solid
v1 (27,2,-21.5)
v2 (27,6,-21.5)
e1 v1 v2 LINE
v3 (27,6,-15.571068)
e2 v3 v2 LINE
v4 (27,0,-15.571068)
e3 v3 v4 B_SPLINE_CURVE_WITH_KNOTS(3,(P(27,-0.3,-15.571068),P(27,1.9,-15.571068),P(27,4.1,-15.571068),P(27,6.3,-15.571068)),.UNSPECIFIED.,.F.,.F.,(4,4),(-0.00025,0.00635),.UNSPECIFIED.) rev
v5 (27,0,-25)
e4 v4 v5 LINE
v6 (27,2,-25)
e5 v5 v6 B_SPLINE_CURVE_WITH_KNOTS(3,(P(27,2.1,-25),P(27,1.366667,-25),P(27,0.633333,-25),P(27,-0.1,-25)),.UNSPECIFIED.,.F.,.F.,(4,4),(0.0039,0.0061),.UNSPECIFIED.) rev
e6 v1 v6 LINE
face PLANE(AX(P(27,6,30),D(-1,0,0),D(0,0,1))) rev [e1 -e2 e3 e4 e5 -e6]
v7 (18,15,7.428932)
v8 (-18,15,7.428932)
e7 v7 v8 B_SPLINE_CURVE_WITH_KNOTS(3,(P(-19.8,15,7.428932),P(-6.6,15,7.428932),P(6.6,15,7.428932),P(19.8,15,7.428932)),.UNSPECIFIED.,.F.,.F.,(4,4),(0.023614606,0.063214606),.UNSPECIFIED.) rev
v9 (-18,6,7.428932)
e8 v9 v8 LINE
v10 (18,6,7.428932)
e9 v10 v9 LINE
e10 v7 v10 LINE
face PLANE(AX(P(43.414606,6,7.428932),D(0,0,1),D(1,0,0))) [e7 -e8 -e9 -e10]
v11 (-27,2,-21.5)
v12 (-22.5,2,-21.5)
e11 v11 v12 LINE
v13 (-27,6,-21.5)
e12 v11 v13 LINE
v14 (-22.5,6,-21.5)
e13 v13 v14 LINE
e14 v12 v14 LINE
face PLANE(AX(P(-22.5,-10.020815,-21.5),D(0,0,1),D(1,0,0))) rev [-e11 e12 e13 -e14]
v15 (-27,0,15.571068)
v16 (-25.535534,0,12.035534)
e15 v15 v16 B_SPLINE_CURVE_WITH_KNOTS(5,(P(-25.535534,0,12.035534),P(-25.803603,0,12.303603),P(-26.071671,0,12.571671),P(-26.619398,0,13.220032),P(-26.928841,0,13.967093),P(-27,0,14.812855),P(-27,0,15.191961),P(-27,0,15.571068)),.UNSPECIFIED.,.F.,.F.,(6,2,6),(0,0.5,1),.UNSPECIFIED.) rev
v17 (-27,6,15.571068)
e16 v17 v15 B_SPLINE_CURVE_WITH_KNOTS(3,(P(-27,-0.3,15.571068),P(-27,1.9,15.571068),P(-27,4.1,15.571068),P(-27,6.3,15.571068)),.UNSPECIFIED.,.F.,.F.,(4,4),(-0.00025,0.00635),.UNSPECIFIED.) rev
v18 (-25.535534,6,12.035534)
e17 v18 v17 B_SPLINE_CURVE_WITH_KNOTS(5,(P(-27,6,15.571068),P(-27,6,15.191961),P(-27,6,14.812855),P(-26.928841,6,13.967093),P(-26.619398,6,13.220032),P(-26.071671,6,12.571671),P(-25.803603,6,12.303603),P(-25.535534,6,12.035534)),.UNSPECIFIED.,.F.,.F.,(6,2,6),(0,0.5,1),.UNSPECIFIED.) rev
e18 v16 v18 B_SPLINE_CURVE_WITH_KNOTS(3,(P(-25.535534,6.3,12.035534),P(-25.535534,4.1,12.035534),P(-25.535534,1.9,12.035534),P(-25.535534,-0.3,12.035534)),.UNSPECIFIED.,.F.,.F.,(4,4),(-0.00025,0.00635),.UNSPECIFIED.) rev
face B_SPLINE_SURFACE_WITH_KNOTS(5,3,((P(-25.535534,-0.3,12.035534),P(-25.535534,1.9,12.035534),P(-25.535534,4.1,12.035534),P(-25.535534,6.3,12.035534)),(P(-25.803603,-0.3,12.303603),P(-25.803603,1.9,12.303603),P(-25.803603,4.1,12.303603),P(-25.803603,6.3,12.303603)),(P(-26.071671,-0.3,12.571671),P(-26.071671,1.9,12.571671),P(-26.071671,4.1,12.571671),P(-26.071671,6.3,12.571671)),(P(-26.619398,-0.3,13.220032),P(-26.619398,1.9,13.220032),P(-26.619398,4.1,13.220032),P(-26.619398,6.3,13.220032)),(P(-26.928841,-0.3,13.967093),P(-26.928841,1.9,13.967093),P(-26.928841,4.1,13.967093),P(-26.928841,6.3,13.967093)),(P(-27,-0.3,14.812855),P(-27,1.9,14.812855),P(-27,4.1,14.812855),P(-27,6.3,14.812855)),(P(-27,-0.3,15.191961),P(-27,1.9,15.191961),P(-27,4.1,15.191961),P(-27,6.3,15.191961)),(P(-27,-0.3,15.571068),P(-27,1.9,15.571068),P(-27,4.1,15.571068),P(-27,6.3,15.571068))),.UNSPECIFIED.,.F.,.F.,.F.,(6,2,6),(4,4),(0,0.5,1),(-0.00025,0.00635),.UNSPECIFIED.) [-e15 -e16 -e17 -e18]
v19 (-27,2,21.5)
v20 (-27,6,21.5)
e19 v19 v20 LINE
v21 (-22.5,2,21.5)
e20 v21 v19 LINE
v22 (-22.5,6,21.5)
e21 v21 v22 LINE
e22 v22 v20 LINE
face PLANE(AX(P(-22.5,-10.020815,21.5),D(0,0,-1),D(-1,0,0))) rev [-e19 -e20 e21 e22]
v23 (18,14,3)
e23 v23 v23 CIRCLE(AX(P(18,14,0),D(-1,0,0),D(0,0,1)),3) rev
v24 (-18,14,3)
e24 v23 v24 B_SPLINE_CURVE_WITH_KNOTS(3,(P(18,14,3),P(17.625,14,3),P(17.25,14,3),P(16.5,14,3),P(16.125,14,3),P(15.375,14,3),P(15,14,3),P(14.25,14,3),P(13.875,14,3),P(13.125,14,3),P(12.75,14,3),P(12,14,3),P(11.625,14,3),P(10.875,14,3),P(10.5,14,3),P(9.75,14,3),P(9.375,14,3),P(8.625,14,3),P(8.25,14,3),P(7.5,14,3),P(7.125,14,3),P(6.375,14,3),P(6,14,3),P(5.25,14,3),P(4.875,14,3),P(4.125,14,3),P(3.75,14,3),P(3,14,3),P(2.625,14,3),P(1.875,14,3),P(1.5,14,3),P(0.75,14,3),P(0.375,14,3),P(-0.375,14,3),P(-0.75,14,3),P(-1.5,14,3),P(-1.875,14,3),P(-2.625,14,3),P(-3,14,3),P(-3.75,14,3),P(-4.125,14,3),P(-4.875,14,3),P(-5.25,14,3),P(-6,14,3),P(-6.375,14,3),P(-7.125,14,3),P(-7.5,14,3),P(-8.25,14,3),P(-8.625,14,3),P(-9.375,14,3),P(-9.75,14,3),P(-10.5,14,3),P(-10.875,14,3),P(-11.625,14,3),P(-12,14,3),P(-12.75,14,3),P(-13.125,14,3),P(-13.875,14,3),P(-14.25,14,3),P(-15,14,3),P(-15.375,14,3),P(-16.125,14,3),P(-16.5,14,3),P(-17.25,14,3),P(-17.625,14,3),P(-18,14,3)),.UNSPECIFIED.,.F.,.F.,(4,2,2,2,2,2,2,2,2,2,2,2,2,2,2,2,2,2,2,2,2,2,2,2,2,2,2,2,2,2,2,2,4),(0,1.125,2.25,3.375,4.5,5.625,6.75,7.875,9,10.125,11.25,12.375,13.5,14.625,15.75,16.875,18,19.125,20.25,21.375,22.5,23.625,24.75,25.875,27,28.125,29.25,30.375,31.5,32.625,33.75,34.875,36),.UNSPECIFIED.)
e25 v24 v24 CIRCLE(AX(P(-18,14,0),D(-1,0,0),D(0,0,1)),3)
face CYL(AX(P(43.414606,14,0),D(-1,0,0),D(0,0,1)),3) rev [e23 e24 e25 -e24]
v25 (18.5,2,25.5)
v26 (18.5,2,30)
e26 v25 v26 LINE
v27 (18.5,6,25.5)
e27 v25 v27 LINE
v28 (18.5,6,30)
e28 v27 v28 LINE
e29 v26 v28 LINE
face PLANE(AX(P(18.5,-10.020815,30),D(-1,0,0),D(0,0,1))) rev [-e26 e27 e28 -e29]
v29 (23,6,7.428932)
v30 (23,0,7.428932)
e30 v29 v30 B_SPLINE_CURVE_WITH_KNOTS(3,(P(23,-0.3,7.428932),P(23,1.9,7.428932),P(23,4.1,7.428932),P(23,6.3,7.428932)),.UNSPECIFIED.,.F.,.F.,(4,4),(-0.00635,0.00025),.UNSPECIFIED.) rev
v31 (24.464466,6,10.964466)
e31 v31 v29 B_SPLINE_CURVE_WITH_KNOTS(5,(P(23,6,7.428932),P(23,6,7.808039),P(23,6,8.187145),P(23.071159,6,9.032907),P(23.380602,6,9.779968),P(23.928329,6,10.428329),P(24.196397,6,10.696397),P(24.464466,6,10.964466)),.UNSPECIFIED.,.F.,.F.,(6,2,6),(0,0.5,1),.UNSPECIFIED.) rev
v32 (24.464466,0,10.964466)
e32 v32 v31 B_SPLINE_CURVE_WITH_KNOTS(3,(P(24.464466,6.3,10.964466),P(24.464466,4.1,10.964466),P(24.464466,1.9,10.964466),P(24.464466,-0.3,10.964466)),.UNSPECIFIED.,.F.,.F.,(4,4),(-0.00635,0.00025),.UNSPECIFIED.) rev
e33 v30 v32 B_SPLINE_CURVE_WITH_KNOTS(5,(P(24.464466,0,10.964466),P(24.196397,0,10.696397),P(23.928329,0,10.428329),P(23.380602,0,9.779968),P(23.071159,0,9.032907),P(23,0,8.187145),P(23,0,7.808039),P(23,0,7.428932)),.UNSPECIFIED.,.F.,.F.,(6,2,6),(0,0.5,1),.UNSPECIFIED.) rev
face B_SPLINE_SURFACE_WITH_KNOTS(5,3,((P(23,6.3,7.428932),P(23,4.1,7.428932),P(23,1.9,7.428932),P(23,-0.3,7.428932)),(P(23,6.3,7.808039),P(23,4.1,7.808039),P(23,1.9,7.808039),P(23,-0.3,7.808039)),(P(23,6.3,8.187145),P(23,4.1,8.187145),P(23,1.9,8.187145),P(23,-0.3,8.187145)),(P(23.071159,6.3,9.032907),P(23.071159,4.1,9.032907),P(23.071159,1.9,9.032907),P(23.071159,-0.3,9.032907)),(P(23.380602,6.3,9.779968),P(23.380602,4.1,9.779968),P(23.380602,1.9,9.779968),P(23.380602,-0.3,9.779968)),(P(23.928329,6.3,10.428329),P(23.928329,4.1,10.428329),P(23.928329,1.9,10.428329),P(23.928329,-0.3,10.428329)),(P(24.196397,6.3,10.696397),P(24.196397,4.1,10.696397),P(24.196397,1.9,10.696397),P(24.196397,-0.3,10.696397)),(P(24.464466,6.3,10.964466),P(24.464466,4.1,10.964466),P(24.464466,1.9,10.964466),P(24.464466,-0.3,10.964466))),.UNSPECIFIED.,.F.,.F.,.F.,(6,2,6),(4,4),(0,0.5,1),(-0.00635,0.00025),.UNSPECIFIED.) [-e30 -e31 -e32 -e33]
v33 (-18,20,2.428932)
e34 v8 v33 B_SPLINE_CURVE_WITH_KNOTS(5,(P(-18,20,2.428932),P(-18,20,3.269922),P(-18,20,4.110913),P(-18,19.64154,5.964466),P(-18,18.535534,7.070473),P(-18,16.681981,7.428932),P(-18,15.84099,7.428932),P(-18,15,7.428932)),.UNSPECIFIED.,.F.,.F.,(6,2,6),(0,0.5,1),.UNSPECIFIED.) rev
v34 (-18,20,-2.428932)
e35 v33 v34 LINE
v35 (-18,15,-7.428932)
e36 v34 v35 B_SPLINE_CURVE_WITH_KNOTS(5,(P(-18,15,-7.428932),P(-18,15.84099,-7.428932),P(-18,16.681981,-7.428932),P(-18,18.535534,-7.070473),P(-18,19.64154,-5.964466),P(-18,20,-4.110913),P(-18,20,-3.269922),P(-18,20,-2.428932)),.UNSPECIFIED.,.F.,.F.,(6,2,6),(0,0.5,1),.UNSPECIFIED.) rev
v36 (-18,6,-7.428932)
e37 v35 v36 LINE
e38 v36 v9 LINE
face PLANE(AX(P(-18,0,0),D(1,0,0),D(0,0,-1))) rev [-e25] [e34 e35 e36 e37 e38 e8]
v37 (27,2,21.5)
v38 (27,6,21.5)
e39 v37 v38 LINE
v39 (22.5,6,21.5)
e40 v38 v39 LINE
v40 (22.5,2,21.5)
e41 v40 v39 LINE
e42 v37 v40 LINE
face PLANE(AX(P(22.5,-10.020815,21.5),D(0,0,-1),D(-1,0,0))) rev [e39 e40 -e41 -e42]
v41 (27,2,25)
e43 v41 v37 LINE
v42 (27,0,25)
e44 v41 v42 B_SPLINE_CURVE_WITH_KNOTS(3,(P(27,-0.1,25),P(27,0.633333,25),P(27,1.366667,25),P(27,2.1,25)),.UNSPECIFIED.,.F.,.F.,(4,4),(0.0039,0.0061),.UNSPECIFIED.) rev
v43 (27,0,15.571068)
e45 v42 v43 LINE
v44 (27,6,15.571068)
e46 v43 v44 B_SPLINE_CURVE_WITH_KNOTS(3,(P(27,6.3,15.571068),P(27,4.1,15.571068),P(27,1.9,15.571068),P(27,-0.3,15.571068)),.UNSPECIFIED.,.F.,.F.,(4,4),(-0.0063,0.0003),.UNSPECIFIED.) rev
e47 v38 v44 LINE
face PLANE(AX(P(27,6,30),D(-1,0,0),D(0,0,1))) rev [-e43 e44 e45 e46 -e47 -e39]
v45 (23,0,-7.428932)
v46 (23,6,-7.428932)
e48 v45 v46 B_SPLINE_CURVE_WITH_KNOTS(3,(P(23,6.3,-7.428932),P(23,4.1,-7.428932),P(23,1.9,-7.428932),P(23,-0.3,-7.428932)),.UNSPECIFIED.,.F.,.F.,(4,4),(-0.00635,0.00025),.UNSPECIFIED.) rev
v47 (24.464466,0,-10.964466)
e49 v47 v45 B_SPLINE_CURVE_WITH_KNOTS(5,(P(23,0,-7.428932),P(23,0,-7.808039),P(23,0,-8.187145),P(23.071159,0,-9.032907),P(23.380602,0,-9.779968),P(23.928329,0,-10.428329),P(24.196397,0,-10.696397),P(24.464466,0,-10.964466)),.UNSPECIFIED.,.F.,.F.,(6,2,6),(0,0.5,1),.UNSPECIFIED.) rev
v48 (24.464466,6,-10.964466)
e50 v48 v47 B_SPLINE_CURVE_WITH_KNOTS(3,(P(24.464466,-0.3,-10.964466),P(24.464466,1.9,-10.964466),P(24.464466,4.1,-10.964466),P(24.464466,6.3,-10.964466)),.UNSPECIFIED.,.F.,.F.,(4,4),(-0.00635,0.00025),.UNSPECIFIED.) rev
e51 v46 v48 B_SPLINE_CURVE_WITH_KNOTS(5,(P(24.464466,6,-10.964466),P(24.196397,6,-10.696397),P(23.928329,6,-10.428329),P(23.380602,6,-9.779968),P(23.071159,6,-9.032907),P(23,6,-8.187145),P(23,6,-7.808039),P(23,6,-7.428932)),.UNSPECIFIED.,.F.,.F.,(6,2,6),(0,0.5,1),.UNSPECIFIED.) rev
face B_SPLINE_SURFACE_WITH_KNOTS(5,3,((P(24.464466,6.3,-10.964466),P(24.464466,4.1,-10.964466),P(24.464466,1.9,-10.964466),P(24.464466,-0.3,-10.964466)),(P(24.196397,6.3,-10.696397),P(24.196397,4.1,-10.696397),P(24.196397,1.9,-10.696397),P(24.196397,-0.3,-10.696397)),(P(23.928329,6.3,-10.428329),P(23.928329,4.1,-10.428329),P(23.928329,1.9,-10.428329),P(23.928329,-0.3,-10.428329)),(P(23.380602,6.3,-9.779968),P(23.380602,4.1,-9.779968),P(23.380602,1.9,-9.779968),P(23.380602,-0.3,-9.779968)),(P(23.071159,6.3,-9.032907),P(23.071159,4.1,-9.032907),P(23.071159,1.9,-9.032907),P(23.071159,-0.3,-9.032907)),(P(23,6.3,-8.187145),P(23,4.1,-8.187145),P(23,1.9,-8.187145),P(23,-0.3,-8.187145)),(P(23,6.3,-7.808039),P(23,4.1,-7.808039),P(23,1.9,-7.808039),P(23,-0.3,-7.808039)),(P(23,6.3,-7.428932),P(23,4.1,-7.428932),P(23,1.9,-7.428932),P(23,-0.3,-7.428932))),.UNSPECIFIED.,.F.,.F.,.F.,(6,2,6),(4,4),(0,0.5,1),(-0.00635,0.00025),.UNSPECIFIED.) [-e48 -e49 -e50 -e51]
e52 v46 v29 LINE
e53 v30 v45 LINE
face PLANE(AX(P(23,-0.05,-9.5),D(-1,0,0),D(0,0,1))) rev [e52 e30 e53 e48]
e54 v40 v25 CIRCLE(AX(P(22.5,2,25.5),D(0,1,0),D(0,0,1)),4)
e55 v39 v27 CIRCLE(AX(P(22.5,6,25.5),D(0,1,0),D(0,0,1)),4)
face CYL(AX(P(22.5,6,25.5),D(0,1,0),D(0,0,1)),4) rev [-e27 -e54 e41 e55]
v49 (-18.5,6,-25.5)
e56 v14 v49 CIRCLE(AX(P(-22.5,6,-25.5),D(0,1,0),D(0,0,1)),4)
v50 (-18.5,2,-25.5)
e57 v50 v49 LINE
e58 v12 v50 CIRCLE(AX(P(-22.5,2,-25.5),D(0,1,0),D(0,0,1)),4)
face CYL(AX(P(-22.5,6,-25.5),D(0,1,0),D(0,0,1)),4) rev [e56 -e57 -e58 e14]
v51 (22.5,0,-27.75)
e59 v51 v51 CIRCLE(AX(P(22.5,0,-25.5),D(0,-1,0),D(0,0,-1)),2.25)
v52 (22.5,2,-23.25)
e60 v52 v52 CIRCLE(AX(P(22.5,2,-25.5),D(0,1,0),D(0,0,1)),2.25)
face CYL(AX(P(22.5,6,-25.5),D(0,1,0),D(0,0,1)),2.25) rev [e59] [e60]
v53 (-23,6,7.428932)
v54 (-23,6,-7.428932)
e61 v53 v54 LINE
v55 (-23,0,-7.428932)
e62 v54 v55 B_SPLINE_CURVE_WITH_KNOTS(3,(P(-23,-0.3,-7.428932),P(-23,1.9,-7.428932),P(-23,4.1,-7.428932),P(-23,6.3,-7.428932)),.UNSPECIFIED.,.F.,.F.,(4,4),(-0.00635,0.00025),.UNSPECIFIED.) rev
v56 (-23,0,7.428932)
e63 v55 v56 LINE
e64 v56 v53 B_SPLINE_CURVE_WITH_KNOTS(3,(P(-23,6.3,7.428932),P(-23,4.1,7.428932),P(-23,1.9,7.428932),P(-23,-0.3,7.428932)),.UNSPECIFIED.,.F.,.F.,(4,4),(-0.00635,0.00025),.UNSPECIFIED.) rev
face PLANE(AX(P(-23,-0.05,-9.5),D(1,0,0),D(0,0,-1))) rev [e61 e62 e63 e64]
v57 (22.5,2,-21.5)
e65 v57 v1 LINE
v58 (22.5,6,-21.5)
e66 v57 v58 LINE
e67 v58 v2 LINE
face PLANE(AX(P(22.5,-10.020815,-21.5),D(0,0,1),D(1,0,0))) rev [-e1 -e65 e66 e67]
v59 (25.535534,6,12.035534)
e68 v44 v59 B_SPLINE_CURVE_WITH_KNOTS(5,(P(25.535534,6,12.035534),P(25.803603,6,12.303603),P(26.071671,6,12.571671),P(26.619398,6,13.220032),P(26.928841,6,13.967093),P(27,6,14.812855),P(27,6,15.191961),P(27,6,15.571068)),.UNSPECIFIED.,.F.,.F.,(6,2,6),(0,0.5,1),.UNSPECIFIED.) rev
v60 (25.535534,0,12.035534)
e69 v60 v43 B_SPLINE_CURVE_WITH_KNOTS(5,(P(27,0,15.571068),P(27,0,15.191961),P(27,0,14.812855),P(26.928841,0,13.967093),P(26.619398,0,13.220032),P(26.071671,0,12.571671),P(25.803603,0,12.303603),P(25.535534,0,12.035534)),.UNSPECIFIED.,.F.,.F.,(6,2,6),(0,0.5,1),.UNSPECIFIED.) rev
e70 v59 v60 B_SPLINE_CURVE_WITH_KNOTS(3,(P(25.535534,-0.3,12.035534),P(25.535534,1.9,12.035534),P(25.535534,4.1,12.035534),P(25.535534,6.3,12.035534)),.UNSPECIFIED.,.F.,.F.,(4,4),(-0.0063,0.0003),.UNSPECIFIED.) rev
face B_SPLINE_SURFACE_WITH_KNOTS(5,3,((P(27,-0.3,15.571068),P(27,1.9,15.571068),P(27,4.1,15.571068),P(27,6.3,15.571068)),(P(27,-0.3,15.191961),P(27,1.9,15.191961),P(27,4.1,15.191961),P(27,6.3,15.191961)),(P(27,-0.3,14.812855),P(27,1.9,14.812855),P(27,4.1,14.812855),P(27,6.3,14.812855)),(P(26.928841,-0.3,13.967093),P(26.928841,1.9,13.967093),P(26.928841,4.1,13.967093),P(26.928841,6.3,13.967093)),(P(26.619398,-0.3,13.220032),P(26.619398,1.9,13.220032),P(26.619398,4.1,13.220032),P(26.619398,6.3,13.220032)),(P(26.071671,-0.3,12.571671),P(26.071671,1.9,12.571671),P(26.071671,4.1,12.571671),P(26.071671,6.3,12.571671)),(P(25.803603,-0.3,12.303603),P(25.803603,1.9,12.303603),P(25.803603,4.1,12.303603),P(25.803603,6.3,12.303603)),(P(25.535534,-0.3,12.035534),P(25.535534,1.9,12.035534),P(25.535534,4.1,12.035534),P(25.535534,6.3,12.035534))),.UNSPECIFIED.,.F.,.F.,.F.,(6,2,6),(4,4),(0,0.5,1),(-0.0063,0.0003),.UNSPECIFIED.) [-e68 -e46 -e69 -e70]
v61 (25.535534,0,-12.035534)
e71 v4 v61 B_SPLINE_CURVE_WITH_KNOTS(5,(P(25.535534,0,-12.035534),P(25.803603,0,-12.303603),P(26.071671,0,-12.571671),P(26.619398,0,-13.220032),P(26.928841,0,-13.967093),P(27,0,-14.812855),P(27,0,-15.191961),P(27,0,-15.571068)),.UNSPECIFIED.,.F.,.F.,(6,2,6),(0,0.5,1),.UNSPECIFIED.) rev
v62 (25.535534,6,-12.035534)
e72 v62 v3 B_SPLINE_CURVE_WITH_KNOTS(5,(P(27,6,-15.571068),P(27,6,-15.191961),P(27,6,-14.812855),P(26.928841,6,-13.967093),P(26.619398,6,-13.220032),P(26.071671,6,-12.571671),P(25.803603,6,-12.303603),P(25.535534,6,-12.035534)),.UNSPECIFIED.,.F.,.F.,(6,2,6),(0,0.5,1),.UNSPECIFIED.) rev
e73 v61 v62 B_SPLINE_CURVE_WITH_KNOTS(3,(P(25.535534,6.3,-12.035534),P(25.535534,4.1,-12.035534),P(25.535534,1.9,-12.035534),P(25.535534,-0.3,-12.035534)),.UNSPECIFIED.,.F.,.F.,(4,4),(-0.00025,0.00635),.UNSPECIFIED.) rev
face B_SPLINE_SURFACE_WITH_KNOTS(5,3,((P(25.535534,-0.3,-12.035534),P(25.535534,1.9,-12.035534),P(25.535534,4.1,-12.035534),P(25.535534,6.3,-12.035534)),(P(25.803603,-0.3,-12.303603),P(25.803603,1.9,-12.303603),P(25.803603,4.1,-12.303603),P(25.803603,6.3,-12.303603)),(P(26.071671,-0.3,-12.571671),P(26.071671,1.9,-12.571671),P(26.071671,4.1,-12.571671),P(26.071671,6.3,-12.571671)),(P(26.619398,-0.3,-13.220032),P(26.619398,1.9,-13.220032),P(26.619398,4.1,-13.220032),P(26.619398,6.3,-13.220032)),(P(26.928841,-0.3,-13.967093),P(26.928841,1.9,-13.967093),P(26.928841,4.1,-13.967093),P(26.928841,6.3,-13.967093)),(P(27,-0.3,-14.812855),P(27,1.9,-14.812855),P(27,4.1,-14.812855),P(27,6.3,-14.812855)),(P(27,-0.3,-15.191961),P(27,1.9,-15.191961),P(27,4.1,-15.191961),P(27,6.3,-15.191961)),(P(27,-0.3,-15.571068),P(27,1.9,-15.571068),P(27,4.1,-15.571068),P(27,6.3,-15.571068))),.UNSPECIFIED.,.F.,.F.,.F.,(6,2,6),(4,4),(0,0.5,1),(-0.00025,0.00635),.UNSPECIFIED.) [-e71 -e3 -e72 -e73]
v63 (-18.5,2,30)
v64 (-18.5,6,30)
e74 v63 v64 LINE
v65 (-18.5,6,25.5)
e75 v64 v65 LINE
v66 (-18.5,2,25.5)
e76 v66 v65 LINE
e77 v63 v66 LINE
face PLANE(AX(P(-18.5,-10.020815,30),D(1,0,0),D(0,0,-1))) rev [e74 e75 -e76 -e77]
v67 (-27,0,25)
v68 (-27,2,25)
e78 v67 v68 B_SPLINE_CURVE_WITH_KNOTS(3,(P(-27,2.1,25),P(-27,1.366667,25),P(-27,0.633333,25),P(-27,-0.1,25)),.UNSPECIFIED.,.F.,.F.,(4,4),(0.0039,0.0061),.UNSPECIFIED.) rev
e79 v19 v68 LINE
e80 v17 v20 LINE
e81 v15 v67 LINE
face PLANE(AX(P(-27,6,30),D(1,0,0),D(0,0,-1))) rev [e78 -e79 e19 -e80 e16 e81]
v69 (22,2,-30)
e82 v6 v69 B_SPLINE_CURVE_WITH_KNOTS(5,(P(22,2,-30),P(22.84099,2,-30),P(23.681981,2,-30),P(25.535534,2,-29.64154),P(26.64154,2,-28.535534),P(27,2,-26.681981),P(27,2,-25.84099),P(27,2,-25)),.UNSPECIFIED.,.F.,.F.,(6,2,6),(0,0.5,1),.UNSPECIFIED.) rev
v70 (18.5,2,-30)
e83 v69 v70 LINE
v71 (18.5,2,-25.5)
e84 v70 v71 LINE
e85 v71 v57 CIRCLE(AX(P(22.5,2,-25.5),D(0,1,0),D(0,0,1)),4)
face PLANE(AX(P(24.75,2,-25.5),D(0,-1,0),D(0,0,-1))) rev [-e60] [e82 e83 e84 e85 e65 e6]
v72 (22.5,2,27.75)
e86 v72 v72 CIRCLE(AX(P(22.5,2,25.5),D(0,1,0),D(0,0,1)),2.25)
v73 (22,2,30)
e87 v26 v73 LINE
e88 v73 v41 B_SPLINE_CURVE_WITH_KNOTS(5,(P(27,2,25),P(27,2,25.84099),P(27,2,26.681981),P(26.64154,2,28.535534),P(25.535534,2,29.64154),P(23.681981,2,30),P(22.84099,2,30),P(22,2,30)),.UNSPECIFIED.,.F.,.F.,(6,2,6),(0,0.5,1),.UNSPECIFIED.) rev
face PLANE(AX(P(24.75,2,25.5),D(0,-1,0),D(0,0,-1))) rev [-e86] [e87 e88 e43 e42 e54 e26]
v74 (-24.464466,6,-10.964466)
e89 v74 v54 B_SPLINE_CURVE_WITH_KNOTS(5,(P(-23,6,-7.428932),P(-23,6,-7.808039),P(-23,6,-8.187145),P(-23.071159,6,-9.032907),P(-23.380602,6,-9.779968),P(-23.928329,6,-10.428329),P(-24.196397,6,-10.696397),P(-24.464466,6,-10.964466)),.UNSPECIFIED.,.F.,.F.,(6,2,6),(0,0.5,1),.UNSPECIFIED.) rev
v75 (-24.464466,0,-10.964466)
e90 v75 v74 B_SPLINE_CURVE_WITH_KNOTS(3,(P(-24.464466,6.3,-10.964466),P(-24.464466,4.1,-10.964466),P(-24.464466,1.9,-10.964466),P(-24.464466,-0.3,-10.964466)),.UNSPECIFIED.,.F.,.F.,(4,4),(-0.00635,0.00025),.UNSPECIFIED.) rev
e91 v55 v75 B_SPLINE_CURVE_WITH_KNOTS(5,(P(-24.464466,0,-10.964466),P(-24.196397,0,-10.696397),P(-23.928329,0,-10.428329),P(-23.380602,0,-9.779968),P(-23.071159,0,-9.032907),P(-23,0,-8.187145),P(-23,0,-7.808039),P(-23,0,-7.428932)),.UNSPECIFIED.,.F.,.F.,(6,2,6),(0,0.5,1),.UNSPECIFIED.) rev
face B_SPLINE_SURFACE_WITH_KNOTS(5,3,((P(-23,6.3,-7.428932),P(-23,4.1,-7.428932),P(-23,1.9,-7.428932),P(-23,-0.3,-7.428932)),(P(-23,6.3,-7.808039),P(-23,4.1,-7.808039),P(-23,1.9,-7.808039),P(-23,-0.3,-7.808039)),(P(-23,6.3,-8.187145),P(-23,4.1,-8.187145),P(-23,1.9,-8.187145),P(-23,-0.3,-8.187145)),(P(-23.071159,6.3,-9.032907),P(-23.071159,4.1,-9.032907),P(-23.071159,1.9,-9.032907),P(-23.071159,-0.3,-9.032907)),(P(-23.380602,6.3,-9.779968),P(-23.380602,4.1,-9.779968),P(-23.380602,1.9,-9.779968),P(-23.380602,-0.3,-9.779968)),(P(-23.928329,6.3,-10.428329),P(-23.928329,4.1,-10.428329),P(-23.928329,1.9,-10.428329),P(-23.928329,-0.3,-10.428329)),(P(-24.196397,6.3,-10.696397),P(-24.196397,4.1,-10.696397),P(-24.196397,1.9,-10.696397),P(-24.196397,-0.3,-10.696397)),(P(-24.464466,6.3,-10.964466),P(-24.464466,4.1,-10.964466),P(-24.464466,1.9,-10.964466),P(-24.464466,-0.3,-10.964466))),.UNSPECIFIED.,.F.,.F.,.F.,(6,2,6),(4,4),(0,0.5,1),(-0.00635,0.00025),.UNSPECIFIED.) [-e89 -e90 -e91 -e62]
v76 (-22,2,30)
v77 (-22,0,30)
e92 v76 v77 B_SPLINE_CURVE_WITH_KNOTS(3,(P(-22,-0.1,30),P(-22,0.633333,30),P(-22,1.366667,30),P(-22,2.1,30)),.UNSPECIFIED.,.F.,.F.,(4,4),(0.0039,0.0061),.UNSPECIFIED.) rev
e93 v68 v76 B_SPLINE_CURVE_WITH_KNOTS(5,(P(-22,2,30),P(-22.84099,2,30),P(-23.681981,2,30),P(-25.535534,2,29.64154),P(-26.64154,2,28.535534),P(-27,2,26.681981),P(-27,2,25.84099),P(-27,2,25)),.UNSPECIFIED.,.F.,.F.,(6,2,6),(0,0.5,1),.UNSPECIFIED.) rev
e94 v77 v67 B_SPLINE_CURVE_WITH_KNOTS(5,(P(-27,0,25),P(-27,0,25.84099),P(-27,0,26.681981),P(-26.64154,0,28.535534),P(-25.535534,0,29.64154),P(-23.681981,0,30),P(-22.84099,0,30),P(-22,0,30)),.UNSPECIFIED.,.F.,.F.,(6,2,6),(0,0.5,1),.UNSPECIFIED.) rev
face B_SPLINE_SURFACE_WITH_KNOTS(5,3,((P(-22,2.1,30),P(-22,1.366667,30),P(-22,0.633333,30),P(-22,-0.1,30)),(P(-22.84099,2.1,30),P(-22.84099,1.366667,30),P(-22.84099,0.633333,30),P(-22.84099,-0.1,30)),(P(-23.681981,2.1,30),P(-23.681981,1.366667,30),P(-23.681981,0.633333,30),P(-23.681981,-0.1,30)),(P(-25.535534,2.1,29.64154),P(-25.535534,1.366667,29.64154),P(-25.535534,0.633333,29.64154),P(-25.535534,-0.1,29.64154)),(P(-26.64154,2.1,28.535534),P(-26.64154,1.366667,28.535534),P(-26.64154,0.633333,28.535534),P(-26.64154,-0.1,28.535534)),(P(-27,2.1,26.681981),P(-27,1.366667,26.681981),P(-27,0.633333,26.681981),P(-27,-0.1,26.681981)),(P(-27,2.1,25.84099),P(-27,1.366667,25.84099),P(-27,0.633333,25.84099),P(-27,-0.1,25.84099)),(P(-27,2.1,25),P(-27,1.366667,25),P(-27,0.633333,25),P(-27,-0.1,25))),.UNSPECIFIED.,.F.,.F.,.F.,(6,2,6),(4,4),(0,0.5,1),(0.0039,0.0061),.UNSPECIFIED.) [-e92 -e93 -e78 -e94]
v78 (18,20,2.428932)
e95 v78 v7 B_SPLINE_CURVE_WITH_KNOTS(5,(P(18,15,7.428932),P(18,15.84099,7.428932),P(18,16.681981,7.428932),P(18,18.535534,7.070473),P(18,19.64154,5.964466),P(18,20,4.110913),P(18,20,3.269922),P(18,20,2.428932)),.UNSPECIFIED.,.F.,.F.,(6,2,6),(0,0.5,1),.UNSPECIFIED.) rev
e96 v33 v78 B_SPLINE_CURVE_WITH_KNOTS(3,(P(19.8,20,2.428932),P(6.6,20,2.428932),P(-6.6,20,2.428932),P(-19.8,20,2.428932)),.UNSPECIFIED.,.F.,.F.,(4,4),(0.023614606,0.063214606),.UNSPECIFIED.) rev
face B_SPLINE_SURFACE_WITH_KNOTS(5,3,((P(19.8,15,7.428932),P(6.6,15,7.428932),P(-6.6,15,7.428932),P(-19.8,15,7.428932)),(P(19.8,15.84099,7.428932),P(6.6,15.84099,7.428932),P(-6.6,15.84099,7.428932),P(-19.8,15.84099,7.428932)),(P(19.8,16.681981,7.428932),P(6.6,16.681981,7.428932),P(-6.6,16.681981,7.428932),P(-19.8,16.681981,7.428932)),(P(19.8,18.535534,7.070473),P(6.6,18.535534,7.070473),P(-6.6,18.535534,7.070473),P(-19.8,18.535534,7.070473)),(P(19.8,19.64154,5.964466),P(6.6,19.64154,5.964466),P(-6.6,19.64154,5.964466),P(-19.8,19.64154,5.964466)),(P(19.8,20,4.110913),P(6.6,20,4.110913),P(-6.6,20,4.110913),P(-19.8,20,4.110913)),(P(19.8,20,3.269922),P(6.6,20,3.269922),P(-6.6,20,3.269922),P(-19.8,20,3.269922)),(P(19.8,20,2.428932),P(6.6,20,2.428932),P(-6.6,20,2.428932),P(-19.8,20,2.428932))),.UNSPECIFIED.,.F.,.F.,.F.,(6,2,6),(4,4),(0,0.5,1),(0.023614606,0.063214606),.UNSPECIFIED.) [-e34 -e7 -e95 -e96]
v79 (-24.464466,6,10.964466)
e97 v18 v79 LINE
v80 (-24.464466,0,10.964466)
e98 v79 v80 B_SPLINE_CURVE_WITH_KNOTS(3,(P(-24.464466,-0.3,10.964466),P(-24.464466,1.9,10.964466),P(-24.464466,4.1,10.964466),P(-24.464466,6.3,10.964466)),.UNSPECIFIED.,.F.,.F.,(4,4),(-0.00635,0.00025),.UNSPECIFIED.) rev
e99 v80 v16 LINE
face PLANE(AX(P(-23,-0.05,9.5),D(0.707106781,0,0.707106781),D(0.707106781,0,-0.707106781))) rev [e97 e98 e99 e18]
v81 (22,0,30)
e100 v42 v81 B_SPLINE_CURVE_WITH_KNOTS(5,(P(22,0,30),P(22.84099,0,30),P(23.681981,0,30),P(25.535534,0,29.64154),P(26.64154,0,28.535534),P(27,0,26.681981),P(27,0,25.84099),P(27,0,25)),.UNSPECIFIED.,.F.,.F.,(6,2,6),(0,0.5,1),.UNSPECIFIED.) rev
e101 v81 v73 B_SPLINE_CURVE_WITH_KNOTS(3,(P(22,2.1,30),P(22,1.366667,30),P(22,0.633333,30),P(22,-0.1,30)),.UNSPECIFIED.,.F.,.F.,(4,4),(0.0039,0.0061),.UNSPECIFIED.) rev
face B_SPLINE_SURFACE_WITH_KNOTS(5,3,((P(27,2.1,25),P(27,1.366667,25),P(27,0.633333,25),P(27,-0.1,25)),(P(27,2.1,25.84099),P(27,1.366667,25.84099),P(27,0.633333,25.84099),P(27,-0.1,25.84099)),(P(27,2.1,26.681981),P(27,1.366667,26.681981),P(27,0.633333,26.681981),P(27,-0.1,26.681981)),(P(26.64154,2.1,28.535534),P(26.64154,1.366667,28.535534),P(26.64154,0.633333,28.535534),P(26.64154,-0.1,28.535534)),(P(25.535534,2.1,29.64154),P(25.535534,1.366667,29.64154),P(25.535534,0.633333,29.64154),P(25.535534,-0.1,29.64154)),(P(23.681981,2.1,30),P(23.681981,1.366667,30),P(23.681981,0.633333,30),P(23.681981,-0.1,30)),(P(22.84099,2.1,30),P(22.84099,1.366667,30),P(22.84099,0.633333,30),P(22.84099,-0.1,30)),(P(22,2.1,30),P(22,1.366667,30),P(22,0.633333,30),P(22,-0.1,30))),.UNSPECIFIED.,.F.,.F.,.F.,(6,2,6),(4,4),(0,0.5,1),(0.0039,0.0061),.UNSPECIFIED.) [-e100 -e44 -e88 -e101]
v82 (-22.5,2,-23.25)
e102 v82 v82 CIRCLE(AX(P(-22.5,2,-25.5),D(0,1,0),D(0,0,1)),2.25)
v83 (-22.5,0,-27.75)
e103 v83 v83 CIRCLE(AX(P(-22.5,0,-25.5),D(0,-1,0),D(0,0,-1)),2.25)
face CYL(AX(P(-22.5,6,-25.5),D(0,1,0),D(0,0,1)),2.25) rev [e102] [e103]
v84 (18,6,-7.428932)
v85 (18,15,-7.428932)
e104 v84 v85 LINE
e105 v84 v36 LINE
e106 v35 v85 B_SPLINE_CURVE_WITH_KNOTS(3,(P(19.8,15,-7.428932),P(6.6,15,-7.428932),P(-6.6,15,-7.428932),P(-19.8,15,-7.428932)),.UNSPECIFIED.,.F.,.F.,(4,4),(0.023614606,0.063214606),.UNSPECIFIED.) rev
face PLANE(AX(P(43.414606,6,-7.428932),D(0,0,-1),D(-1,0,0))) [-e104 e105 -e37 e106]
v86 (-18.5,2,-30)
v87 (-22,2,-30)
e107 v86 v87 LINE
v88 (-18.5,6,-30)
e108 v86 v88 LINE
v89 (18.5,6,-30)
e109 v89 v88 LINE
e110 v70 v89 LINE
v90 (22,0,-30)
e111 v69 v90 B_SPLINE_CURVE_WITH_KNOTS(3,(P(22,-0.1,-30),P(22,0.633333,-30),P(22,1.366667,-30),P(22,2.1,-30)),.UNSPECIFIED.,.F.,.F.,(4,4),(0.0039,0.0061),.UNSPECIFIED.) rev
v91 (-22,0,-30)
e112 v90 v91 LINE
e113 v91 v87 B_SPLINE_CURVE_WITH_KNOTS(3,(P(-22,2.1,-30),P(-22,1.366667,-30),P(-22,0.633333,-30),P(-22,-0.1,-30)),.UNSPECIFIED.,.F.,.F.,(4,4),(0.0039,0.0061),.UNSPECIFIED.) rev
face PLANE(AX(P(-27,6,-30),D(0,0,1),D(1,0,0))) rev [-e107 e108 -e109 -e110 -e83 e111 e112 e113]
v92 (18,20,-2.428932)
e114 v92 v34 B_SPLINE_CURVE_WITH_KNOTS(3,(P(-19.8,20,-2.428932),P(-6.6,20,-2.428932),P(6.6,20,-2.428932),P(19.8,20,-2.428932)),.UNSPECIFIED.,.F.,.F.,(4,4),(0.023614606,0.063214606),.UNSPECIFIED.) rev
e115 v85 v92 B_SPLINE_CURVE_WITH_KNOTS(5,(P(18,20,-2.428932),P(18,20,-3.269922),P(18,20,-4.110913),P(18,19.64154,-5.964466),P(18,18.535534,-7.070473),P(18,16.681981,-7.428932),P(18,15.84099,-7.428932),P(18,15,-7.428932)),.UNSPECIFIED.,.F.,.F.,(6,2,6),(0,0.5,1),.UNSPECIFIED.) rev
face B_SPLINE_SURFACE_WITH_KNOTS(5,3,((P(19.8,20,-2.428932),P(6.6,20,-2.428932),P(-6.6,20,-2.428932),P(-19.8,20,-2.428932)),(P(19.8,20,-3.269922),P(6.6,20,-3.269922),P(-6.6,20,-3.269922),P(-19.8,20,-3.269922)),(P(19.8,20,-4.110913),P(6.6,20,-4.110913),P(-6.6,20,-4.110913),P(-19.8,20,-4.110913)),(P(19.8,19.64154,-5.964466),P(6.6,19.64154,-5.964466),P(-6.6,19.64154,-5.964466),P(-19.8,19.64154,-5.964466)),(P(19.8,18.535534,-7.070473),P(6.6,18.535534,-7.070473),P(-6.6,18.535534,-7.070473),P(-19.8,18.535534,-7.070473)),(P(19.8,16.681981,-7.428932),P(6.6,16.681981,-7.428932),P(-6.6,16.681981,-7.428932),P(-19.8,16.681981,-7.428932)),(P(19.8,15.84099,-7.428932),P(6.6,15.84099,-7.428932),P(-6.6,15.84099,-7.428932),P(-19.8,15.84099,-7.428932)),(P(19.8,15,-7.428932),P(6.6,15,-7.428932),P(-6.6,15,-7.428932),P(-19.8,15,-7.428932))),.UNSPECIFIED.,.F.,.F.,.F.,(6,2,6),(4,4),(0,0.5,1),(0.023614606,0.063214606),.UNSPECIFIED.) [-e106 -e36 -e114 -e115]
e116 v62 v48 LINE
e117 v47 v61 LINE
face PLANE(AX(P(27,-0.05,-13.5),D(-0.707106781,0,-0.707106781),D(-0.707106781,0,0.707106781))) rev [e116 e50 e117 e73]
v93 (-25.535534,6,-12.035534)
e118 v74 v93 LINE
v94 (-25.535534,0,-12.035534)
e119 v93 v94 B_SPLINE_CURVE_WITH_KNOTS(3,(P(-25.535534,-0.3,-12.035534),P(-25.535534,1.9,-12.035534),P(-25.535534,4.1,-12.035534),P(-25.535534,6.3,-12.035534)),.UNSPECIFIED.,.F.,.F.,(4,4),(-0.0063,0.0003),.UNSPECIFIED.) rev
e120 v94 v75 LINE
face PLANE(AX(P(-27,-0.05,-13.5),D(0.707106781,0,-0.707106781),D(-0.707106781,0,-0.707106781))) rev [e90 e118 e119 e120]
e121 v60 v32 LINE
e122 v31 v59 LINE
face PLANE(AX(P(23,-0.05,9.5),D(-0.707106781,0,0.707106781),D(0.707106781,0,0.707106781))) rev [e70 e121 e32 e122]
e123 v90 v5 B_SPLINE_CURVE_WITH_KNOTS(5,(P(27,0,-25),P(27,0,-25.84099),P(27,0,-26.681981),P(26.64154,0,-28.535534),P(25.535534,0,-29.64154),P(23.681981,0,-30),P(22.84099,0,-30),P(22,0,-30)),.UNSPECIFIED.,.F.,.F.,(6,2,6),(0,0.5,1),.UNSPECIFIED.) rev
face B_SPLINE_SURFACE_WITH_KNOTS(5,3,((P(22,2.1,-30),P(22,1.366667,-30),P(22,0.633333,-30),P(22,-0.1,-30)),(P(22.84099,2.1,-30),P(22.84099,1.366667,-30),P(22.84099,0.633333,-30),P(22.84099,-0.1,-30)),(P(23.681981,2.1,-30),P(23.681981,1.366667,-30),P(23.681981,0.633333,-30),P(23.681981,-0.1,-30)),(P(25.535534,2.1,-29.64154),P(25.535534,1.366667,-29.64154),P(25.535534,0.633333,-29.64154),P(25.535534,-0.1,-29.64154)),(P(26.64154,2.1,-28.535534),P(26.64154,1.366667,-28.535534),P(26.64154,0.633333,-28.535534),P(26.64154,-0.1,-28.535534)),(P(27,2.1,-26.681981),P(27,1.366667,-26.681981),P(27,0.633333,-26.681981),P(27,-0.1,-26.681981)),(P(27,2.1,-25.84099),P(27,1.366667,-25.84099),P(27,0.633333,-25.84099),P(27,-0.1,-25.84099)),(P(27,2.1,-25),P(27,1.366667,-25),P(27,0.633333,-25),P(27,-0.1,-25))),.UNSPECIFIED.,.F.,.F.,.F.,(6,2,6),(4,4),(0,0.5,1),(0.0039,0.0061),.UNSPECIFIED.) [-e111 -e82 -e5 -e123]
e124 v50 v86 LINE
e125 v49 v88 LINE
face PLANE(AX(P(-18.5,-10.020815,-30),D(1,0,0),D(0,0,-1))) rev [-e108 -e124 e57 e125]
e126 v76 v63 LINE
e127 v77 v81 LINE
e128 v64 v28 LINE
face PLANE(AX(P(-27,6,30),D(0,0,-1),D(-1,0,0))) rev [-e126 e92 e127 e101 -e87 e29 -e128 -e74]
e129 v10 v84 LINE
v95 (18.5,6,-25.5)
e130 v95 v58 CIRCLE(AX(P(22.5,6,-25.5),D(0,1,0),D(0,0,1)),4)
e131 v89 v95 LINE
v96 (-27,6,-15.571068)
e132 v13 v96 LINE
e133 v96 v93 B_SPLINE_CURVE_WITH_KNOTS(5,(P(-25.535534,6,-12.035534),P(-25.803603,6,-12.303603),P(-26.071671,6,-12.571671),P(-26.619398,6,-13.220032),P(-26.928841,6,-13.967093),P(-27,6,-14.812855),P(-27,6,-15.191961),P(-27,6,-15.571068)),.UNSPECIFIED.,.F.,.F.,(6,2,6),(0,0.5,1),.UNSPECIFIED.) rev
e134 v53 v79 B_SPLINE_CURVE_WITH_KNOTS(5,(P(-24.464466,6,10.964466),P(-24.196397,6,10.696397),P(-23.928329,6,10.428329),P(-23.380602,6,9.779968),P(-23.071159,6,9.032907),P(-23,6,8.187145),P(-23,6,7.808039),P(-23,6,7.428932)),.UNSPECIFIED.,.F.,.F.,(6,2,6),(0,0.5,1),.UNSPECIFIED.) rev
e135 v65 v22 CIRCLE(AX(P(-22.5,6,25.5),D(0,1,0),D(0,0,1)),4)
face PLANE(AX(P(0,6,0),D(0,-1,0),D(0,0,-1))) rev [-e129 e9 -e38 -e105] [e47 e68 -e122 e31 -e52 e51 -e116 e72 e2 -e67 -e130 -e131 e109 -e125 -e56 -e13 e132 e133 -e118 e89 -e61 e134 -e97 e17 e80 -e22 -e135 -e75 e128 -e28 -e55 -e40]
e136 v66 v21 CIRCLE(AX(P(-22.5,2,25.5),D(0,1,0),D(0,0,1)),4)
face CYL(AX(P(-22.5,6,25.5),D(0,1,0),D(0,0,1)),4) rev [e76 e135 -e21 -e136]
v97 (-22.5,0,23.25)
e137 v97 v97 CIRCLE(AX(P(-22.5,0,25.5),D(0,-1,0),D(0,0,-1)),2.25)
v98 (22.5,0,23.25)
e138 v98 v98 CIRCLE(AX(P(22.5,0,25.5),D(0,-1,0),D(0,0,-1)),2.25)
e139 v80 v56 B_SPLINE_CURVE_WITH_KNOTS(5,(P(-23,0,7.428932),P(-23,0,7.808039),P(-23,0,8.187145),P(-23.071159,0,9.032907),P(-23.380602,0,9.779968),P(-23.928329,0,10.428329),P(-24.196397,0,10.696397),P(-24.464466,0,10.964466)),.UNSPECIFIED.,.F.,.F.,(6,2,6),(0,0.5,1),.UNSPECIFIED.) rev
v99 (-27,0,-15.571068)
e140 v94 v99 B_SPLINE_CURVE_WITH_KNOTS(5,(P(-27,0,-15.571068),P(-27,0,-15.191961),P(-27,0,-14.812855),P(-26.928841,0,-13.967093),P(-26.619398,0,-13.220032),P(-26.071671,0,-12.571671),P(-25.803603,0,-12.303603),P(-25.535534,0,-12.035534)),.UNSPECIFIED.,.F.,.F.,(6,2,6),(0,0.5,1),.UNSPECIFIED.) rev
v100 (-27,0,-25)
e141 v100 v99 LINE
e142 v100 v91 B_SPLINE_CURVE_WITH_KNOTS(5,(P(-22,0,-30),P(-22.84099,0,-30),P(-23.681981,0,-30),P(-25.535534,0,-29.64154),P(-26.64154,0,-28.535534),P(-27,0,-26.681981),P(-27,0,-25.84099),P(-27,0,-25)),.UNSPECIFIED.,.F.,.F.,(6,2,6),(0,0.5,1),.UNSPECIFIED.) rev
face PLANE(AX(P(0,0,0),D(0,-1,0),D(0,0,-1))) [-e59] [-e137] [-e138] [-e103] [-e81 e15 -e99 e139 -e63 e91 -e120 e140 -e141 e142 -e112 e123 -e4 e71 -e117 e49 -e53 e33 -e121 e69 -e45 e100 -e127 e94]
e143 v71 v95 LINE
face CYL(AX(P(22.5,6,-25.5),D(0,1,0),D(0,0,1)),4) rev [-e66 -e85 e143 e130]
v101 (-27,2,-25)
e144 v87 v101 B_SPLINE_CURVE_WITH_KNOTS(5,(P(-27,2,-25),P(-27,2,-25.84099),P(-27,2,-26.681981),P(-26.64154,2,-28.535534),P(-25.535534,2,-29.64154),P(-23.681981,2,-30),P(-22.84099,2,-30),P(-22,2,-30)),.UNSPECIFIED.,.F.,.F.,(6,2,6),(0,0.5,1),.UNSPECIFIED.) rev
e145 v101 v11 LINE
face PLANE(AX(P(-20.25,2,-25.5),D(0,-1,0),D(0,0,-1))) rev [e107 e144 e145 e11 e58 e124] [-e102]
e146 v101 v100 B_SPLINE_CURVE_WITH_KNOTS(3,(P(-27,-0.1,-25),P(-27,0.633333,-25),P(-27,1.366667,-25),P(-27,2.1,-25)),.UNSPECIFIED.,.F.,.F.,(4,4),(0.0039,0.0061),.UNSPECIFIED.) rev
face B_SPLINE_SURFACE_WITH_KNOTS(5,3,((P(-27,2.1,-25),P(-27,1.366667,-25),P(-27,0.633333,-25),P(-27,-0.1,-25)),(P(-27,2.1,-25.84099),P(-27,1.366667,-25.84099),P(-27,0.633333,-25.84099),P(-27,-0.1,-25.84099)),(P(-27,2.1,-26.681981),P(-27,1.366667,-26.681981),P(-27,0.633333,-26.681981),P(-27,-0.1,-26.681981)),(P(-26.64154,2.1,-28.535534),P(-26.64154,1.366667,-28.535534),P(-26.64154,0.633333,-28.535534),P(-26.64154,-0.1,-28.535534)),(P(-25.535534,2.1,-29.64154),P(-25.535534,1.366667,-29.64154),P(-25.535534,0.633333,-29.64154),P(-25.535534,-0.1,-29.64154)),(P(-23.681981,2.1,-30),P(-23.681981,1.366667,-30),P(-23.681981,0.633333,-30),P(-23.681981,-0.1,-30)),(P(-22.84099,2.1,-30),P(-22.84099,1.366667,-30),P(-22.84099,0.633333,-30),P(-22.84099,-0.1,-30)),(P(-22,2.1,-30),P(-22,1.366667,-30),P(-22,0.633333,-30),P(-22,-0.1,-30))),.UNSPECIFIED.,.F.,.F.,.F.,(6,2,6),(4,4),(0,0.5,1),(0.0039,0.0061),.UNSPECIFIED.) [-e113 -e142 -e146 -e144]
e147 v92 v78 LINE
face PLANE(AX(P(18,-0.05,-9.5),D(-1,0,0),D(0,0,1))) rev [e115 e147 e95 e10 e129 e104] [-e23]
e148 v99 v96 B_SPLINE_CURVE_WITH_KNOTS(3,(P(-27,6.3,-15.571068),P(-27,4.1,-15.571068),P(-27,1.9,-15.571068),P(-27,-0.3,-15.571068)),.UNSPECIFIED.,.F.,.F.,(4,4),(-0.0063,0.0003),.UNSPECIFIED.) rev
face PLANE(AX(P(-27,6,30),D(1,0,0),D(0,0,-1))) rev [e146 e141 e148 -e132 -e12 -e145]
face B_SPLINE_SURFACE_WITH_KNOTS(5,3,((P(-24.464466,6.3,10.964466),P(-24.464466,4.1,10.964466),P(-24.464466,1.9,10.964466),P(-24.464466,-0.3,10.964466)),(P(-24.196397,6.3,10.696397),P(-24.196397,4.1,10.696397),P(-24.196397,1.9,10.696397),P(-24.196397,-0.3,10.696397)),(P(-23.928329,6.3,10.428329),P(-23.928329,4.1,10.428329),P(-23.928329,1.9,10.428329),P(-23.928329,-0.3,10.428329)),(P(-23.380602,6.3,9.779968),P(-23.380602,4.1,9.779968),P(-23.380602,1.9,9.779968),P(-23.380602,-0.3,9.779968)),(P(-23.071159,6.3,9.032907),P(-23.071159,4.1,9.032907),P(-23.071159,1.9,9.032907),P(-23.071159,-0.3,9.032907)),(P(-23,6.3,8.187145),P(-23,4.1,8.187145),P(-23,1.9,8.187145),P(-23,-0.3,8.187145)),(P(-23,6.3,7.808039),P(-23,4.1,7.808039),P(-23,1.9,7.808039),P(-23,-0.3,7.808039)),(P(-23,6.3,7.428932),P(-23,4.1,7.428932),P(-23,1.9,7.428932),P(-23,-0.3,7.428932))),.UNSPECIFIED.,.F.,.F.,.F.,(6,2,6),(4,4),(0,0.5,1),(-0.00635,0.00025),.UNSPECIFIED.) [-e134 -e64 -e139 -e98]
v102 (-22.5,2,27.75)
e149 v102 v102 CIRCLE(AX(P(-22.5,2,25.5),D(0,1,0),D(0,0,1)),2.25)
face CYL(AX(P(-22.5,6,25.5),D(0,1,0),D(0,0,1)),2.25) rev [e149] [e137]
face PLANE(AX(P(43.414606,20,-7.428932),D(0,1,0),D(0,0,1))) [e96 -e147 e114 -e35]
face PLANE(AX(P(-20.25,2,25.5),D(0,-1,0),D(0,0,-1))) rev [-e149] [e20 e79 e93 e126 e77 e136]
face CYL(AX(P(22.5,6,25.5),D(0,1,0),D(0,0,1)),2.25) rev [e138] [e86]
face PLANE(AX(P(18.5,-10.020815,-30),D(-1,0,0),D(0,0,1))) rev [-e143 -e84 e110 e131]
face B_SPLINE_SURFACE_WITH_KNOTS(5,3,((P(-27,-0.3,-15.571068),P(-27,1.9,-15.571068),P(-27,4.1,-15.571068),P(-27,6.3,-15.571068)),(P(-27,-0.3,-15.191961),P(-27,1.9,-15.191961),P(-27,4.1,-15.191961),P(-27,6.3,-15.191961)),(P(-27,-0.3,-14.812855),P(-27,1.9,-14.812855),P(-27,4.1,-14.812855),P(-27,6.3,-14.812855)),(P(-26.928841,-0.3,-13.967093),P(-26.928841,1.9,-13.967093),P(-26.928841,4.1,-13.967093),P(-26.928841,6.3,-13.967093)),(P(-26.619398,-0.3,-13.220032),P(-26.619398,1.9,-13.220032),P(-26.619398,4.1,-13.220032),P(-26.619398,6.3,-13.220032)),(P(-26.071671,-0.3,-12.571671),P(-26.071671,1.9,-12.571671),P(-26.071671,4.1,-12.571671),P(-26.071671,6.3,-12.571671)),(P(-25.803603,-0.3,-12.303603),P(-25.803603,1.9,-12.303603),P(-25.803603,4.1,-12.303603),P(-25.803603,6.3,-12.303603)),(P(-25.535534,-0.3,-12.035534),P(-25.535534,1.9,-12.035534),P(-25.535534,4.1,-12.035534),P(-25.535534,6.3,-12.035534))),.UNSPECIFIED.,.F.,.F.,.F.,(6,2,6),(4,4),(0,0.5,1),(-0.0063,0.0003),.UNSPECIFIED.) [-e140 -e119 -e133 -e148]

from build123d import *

# Parameters (mm, degrees)
SKETCH1_W                      = 54
SKETCH1_H                      = 60
BOSS_EXTRUDE1_DEPTH            = 6
CBORE_FOR_M4_SHCS1_D           = 4.5
CBORE_FOR_M4_SHCS1_DEPTH       = 12.4
CBORE_FOR_M4_SHCS1_CBORE_D     = 8
CBORE_FOR_M4_SHCS1_CBORE_DEPTH = 4
CBORE_FOR_M4_SHCS1_TIP         = 1.351936393
CUT_EXTRUDE1_DEPTH             = 4
FILLET1_SIZE                   = 5
CUT_EXTRUDE2_DEPTH             = 41.804411681
BOSS_EXTRUDE2_START            = -5
SKETCH6_W                      = 14.857864376
SKETCH6_H                      = 14
SKETCH6_R                      = 3
BOSS_EXTRUDE2_DEPTH            = 36
FILLET3_SIZE                   = 5


with BuildPart() as part:
    # Sketch1 → Boss-Extrude1 (new body)
    with BuildSketch(Plane(origin=(0, 0, 0), x_dir=(1, 0, 0), z_dir=(0, 1, 0))):
        Rectangle(SKETCH1_W, SKETCH1_H)
    extrude(amount=BOSS_EXTRUDE1_DEPTH)

    # CBORE for M4 SHCS1
    with Locations(Plane(origin=(0, 6, 0), x_dir=(1, 0, 0), z_dir=(0, 1, 0))):
        with Locations((-22.5, 25.5), (-22.5, -25.5), (22.5, -25.5), (22.5, 25.5)):
            CounterBoreHole(CBORE_FOR_M4_SHCS1_D / 2, CBORE_FOR_M4_SHCS1_CBORE_D / 2, CBORE_FOR_M4_SHCS1_CBORE_DEPTH, depth=CBORE_FOR_M4_SHCS1_DEPTH)
            with Locations((0, 0, -(CBORE_FOR_M4_SHCS1_DEPTH + CBORE_FOR_M4_SHCS1_TIP / 2))):  # 118° drill point
                Cone(0, CBORE_FOR_M4_SHCS1_D / 2, CBORE_FOR_M4_SHCS1_TIP, mode=Mode.SUBTRACT)

    # Sketch4 → Cut-Extrude1 (cut)
    with BuildSketch(Plane(origin=(0, 6, 0), x_dir=(1, 0, 0), z_dir=(0, 1, 0))):
        with BuildLine():
            Line((-22.5, 21.5), (-27, 21.5))
            Line((-27, 21.5), (-27, 30))
            Line((-27, 30), (-18.5, 30))
            Line((-18.5, 30), (-18.5, 25.5))
            ThreePointArc((-18.5, 25.5), (-19.671572875, 22.671572875), (-22.5, 21.5))
        make_face()
        with BuildLine():
            Line((22.5, 21.5), (27, 21.5))
            Line((27, 21.5), (27, 30))
            Line((27, 30), (18.5, 30))
            Line((18.5, 30), (18.5, 25.5))
            ThreePointArc((18.5, 25.5), (19.671572875, 22.671572875), (22.5, 21.5))
        make_face()
        with BuildLine():
            Line((18.5, -30), (18.5, -25.5))
            ThreePointArc((18.5, -25.5), (19.671572875, -22.671572875), (22.5, -21.5))
            Line((22.5, -21.5), (27, -21.5))
            Line((27, -21.5), (27, -30))
            Line((27, -30), (18.5, -30))
        make_face()
        with BuildLine():
            Line((-18.5, -30), (-18.5, -25.5))
            ThreePointArc((-18.5, -25.5), (-19.671572875, -22.671572875), (-22.5, -21.5))
            Line((-22.5, -21.5), (-27, -21.5))
            Line((-27, -21.5), (-27, -30))
            Line((-27, -30), (-18.5, -30))
        make_face()
    extrude(amount=-CUT_EXTRUDE1_DEPTH, mode=Mode.SUBTRACT)

    # Fillet1
    # a fillet whose section is not a circle: 5 mm, written as the material it takes off along each edge
    with BuildSketch(Plane(origin=(27, -12.5, -30), x_dir=(0, 0, 1), z_dir=(0, 1, 0)), Plane(origin=(27, -12.5, 30), x_dir=(-1, 0, 0), z_dir=(0, 1, 0))) as fillet1_piece_1:
        with BuildLine():
            add(Edge.make_bspline([(FILLET1_SIZE, 0), (FILLET1_SIZE * 0.831801948466, 0), (FILLET1_SIZE * 0.663603896932, 0), (FILLET1_SIZE * 0.292893218813, -FILLET1_SIZE * 0.0716919198361), (FILLET1_SIZE * 0.0716919198361, -FILLET1_SIZE * 0.292893218813), (0, -FILLET1_SIZE * 0.663603896932), (0, -FILLET1_SIZE * 0.831801948466), (0, -FILLET1_SIZE)], knots=[0, 0, 0, 0, 0, 0, 0.5, 0.5, 1, 1, 1, 1, 1, 1], degree=5))
            Line((0, -FILLET1_SIZE), (0, 0))
            Line((0, 0), (FILLET1_SIZE, 0))
        make_face()
    extrude(amount=27, mode=Mode.SUBTRACT)
    with BuildSketch(Plane(origin=(-27, -12.5, -30), x_dir=(0, 0, 1), z_dir=(0, 1, 0)), Plane(origin=(-27, -12.5, 30), x_dir=(1, 0, 0), z_dir=(0, 1, 0))) as fillet1_piece_2:
        with BuildLine():
            add(Edge.make_bspline([(FILLET1_SIZE, 0), (FILLET1_SIZE * 0.831801948466, 0), (FILLET1_SIZE * 0.663603896932, 0), (FILLET1_SIZE * 0.292893218813, FILLET1_SIZE * 0.0716919198361), (FILLET1_SIZE * 0.0716919198361, FILLET1_SIZE * 0.292893218813), (0, FILLET1_SIZE * 0.663603896932), (0, FILLET1_SIZE * 0.831801948466), (0, FILLET1_SIZE)], knots=[0, 0, 0, 0, 0, 0, 0.5, 0.5, 1, 1, 1, 1, 1, 1], degree=5))
            Line((0, FILLET1_SIZE), (0, 0))
            Line((0, 0), (FILLET1_SIZE, 0))
        make_face()
    extrude(amount=27, mode=Mode.SUBTRACT)

    # Sketch5 → Cut-Extrude2 (cut, through all)
    with BuildSketch(Plane(origin=(0, 6, 0), x_dir=(1, 0, 0), z_dir=(0, 1, 0))):
        Polygon((-27, 13.5), (-23, 9.5), (-23, -9.5), (-27, -13.5), align=None)
        Polygon((27, 13.5), (23, 9.5), (23, -9.5), (27, -13.5), align=None)
    extrude(amount=-CUT_EXTRUDE2_DEPTH, mode=Mode.SUBTRACT)

    # Fillet2
    # a fillet whose section is not a circle: 5 mm, written as the material it adds along each edge
    with BuildSketch(Plane(origin=(-23, 6, 9.5), x_dir=(-0.7071067811865389, 0, 0.7071067811865561), z_dir=(0, -1, 0)), Plane(origin=(23, 6, 9.5), x_dir=(0, 0, -1), z_dir=(0, -1, 0)), Plane(origin=(23, 6, -9.5), x_dir=(0.707106781186557, 0, -0.7071067811865381), z_dir=(0, -1, 0)), Plane(origin=(-23, 6, -9.5), x_dir=(0, 0, 1), z_dir=(0, -1, 0))) as fillet2_piece_1:
        with BuildLine():
            add(Edge.make_bspline([(2.071067812, 0), (1.691961313, 0), (1.312854813, 0), (0.467093497, 0.07115949), (-0.279967621, 0.380602337), (-0.928328541, 0.928328541), (-1.196397318, 1.196397318), (-1.464466094, 1.464466094)], knots=[0, 0, 0, 0, 0, 0, 0.5, 0.5, 1, 1, 1, 1, 1, 1], degree=5))
            Line((-1.464466094, 1.464466094), (0, 0))
            Line((0, 0), (2.071067812, 0))
        make_face()
    extrude(amount=6)
    # a fillet whose section is not a circle: 5 mm, written as the material it takes off along each edge
    with BuildSketch(Plane(origin=(27, 11.17766953, 13.5), x_dir=(-0.7071067811865385, 0, -0.7071067811865565), z_dir=(0, -1, 0)), Plane(origin=(27, 11.17766953, -13.5), x_dir=(0, 0, -1), z_dir=(0, -1, 0)), Plane(origin=(-27, 11.17766953, 13.5), x_dir=(0, 0, 1), z_dir=(0, -1, 0)), Plane(origin=(-27, 11.17766953, -13.5), x_dir=(0.7071067811865569, 0, 0.707106781186538), z_dir=(0, -1, 0))) as fillet2_2_piece_1:
        with BuildLine():
            add(Edge.make_bspline([(2.071067812, 0), (1.691961313, 0), (1.312854813, 0), (0.467093497, -0.07115949), (-0.279967621, -0.380602337), (-0.928328541, -0.928328541), (-1.196397318, -1.196397318), (-1.464466094, -1.464466094)], knots=[0, 0, 0, 0, 0, 0, 0.5, 0.5, 1, 1, 1, 1, 1, 1], degree=5))
            Line((-1.464466094, -1.464466094), (0, 0))
            Line((0, 0), (2.071067812, 0))
        make_face()
    extrude(amount=16.355339059, mode=Mode.SUBTRACT)

    # Sketch6 → Boss-Extrude2 (add)
    with BuildSketch(Plane.ZY.offset(23).offset(BOSS_EXTRUDE2_START)):
        with Locations((0, 13)):
            Rectangle(SKETCH6_W, SKETCH6_H)
        with Locations((0, 14)):
            Circle(SKETCH6_R, mode=Mode.SUBTRACT)
    extrude(amount=-BOSS_EXTRUDE2_DEPTH)

    # Fillet3
    # a fillet whose section is not a circle: 5 mm, written as the material it takes off along each edge
    with BuildSketch(Plane(origin=(-30.5, 20, -7.428932188), x_dir=(0, -1, 0), z_dir=(1, 0, 0))) as fillet3_piece_1:
        with BuildLine():
            add(Edge.make_bspline([(FILLET3_SIZE, 0), (FILLET3_SIZE * 0.831801948466, 0), (FILLET3_SIZE * 0.663603896932, 0), (FILLET3_SIZE * 0.292893218813, -FILLET3_SIZE * 0.0716919198361), (FILLET3_SIZE * 0.0716919198361, -FILLET3_SIZE * 0.292893218813), (0, -FILLET3_SIZE * 0.663603896932), (0, -FILLET3_SIZE * 0.831801948466), (0, -FILLET3_SIZE)], knots=[0, 0, 0, 0, 0, 0, 0.5, 0.5, 1, 1, 1, 1, 1, 1], degree=5))
            Line((0, -FILLET3_SIZE), (0, 0))
            Line((0, 0), (FILLET3_SIZE, 0))
        make_face()
    extrude(amount=61, mode=Mode.SUBTRACT)
    with BuildSketch(Plane(origin=(-30.5, 20, 7.428932188), x_dir=(0, -1, 0), z_dir=(1, 0, 0))) as fillet3_piece_2:
        with BuildLine():
            add(Edge.make_bspline([(FILLET3_SIZE, 0), (FILLET3_SIZE * 0.831801948466, 0), (FILLET3_SIZE * 0.663603896932, 0), (FILLET3_SIZE * 0.292893218813, FILLET3_SIZE * 0.0716919198361), (FILLET3_SIZE * 0.0716919198361, FILLET3_SIZE * 0.292893218813), (0, FILLET3_SIZE * 0.663603896932), (0, FILLET3_SIZE * 0.831801948466), (0, FILLET3_SIZE)], knots=[0, 0, 0, 0, 0, 0, 0.5, 0.5, 1, 1, 1, 1, 1, 1], degree=5))
            Line((0, FILLET3_SIZE), (0, 0))
            Line((0, 0), (FILLET3_SIZE, 0))
        make_face()
    extrude(amount=61, mode=Mode.SUBTRACT)


solid = part.part
